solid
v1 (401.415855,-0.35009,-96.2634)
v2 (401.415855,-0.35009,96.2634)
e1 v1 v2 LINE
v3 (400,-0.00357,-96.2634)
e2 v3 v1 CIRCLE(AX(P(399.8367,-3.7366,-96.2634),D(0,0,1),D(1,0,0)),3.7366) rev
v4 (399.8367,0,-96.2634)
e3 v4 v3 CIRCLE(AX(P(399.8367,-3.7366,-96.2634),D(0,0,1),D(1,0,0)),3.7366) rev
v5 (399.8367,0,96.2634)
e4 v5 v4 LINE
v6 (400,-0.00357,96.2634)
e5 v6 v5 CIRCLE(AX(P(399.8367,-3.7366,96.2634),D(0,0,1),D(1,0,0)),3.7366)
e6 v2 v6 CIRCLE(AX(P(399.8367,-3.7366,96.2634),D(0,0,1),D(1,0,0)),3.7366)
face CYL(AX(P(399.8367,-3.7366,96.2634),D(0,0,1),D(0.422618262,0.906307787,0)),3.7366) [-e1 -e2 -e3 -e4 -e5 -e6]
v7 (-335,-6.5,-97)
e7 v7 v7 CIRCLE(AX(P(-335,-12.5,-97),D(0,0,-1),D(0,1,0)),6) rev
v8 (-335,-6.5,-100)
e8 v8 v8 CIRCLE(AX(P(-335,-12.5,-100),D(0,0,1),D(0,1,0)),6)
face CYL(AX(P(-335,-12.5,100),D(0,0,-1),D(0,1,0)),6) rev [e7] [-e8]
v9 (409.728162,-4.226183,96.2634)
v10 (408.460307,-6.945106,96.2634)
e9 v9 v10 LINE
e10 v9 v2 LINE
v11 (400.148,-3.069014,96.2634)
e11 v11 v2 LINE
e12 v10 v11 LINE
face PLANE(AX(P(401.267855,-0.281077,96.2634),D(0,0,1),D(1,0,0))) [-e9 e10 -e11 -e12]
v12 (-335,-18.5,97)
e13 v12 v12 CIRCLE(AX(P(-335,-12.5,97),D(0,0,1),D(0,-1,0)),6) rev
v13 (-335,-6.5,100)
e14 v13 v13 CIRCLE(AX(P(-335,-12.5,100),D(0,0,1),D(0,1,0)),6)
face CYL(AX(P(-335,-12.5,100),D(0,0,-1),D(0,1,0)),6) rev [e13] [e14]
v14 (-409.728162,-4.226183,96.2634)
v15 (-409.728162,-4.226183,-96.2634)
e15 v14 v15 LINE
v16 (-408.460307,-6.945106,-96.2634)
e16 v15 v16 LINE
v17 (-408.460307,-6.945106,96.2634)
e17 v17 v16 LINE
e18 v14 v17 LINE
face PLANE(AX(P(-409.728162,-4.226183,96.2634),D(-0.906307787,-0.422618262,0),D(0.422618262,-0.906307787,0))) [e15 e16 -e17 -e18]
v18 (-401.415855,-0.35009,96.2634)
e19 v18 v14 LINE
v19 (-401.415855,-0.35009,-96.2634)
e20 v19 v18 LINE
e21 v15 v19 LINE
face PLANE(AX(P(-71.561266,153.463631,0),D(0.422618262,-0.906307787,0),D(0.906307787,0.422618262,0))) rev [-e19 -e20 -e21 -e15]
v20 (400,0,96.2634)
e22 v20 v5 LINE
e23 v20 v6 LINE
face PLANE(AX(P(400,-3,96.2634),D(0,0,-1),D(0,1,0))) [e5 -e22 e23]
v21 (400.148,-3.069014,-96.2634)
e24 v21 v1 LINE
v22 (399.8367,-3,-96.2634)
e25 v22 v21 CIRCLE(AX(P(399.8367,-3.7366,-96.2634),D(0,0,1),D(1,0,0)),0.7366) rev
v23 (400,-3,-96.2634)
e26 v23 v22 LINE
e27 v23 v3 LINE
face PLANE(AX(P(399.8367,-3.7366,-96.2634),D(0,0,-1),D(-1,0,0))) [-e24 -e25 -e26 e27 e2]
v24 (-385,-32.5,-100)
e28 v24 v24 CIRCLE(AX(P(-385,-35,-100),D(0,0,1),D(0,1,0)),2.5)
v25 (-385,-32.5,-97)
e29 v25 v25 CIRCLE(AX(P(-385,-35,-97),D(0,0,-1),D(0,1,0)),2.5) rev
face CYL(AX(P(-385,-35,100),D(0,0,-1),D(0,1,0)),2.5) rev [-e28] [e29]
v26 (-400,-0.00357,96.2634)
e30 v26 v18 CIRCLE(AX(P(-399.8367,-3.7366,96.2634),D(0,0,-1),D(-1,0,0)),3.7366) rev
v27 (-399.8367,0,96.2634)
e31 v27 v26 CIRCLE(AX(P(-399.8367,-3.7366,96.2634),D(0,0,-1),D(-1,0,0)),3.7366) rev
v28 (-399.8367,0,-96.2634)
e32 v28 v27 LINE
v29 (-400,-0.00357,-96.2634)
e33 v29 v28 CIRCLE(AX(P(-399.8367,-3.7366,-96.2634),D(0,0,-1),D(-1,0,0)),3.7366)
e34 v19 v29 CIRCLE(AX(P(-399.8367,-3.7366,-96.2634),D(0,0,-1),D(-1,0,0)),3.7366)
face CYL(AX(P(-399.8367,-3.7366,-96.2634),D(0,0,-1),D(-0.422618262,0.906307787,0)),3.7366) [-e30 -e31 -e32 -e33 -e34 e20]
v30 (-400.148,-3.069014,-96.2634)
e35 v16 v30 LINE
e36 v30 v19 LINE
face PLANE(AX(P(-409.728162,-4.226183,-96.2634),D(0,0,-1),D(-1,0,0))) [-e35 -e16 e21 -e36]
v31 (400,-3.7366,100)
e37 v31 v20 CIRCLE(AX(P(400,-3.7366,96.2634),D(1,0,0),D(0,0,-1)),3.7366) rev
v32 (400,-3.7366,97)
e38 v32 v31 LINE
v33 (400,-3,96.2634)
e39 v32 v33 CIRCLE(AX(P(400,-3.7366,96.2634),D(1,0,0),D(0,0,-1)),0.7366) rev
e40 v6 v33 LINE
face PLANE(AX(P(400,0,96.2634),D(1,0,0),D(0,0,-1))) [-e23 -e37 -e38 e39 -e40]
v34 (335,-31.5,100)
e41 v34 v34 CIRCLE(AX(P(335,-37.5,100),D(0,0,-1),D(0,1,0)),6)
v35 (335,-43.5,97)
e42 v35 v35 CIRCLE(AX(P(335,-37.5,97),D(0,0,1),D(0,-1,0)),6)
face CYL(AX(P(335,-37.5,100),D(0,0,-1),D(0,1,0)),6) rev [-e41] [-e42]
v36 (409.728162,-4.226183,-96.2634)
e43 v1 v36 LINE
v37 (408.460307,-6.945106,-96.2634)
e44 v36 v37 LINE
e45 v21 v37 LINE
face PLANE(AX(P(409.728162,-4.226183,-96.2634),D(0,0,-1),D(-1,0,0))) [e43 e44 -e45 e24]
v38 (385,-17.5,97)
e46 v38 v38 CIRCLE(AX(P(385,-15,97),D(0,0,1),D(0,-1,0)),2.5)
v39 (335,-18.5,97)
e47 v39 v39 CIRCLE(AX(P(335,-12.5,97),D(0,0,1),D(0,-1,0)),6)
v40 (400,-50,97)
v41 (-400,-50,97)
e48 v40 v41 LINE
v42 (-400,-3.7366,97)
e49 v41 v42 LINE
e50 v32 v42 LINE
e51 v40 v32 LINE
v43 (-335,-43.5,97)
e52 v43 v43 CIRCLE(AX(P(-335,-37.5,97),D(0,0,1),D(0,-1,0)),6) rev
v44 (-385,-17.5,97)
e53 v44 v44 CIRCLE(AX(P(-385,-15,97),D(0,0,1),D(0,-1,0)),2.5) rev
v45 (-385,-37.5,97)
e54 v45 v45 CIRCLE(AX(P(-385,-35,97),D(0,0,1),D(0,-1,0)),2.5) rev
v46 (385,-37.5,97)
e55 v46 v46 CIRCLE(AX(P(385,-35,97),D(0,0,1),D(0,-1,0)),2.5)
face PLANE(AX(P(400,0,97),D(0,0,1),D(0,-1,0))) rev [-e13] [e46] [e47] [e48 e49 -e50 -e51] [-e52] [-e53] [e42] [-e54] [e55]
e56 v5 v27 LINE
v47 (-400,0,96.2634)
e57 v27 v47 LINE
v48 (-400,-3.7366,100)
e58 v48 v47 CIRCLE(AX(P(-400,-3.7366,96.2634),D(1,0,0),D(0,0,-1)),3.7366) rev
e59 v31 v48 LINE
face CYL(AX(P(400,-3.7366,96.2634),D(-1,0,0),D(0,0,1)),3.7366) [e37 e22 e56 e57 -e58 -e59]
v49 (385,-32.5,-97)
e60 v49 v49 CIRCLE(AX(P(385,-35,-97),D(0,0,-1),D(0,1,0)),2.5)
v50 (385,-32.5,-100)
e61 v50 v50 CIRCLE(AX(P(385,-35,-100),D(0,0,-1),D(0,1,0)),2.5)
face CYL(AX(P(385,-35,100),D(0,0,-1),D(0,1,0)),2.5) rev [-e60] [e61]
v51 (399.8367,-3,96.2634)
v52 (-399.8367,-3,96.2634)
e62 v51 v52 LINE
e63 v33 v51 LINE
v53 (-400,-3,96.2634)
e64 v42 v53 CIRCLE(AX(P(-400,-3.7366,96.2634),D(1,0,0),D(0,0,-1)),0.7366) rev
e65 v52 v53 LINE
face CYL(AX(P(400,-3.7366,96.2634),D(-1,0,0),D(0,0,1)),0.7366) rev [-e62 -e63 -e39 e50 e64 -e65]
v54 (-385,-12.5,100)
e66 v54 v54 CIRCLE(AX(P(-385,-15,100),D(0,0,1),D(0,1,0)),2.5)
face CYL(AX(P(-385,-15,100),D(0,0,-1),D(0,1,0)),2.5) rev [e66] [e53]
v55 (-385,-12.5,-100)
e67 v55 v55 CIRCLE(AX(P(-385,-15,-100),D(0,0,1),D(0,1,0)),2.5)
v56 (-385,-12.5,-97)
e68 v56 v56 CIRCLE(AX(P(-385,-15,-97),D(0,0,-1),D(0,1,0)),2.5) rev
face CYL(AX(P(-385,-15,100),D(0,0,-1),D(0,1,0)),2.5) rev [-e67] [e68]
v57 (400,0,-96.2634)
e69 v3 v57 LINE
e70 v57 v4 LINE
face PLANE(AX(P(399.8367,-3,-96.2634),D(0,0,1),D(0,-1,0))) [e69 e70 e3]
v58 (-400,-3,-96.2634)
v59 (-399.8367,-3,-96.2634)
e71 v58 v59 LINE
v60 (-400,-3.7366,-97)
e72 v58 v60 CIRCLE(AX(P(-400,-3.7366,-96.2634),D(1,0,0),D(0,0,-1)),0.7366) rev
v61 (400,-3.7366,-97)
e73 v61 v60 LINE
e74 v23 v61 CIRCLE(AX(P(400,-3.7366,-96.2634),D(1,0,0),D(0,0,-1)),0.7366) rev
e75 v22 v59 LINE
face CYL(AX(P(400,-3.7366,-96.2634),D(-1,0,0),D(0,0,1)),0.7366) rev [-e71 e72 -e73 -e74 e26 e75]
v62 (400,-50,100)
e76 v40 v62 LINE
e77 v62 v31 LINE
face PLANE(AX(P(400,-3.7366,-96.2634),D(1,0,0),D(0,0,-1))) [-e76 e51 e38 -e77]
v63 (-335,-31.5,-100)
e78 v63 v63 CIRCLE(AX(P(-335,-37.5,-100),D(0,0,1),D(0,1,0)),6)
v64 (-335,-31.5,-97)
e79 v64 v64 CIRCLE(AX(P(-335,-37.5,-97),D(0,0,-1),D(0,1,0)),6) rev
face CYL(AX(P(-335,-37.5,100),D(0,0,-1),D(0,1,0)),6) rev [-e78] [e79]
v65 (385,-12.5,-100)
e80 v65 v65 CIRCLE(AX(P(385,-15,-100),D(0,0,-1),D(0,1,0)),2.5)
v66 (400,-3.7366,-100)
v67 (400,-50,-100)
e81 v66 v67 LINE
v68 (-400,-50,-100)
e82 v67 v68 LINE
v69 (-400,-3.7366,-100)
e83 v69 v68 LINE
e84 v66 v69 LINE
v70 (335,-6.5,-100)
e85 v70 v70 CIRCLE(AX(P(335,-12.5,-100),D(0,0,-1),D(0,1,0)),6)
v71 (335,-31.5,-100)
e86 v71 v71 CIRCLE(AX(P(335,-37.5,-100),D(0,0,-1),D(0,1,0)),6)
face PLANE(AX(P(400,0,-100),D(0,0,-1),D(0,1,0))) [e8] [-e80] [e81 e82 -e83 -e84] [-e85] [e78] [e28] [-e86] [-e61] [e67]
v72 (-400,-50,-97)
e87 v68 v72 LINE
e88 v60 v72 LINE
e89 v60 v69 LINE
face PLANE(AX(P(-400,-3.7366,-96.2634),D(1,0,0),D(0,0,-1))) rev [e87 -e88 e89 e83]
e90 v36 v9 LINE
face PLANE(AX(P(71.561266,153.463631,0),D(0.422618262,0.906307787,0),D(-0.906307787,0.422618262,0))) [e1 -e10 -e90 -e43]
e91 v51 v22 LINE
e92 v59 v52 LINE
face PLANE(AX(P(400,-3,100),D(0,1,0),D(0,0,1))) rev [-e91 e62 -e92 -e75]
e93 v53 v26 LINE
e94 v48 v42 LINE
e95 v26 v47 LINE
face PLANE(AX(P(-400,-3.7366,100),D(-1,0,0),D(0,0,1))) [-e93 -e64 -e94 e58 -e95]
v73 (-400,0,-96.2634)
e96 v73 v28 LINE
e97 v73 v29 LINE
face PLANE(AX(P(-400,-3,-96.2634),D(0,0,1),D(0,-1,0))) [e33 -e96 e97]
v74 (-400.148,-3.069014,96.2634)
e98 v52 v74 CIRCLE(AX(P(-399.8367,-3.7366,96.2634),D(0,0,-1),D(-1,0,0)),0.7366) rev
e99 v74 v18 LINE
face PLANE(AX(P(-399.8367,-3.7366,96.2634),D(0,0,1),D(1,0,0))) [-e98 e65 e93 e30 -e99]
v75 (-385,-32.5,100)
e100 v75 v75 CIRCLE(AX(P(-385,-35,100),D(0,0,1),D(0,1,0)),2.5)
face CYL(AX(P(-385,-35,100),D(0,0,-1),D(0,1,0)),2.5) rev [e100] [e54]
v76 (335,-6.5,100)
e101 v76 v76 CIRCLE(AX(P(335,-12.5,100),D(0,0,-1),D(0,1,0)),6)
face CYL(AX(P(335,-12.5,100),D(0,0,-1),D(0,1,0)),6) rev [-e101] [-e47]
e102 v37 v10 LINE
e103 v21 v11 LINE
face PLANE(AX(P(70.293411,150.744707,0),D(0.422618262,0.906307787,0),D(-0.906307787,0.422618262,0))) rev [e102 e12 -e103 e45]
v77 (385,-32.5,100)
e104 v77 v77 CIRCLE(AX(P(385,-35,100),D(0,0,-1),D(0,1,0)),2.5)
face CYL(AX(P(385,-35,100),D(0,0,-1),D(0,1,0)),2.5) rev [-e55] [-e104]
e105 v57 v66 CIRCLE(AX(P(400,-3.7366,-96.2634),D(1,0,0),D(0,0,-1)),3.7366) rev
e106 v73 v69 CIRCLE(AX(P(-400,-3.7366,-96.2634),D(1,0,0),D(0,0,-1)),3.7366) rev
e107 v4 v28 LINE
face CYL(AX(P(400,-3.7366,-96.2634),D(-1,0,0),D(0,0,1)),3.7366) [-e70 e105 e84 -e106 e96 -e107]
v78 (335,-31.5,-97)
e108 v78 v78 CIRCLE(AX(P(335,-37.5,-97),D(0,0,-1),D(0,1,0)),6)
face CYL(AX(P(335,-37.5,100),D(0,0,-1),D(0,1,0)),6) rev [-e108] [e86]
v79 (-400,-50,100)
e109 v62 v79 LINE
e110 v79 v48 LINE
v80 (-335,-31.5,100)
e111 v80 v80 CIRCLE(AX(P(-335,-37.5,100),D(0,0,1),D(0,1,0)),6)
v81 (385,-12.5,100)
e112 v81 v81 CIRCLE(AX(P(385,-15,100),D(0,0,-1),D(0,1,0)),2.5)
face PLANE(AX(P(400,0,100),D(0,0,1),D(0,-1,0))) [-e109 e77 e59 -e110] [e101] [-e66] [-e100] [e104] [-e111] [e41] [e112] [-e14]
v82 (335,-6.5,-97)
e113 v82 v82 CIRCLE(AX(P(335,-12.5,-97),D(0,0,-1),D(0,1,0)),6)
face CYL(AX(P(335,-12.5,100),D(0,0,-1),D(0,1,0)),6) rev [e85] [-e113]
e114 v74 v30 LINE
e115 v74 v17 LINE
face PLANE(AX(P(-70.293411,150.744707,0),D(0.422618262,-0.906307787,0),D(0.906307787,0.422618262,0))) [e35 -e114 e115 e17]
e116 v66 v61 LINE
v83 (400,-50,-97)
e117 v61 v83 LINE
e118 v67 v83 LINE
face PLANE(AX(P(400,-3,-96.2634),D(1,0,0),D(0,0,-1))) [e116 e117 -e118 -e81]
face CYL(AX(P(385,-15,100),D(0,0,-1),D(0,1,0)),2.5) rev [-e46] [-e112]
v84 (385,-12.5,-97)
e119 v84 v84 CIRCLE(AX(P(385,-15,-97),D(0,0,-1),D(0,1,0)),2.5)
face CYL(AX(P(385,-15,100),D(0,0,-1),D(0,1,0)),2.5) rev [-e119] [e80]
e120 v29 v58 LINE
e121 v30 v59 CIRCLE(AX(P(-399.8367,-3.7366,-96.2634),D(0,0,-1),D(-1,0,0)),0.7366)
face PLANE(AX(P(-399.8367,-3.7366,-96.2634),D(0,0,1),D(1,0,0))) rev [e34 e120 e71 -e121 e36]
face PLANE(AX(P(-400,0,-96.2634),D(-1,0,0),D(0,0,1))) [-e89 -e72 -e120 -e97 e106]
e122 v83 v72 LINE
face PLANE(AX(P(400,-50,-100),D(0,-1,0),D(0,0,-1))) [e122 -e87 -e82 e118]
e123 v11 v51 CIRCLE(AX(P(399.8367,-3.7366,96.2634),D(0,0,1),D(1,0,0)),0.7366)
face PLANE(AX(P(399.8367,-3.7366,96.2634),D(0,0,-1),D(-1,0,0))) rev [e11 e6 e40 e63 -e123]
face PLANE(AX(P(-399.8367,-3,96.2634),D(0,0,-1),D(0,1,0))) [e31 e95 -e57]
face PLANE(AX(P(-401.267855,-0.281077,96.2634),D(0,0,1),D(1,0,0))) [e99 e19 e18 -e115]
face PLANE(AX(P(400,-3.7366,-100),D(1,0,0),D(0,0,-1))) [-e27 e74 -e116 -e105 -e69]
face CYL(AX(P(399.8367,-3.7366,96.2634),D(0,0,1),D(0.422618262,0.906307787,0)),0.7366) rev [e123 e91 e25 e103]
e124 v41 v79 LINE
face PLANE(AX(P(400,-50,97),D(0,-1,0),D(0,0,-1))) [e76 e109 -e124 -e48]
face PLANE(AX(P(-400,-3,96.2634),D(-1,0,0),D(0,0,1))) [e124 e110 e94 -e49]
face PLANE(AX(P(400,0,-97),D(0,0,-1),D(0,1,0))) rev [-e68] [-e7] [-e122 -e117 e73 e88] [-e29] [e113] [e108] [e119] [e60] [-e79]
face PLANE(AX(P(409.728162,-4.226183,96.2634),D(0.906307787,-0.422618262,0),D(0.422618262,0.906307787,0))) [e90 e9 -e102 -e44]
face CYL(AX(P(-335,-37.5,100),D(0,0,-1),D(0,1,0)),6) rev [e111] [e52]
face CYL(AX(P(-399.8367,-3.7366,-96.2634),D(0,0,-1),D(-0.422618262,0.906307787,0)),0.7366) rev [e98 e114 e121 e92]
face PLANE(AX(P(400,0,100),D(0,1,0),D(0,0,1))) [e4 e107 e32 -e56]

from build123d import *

# Parameters (mm, degrees)
BASE_FLANGE1_DEPTH             = 400
SKETCH6_R                      = 2.5
CUT_EXTRUDE2_DEPTH             = 451
SKETCH10_R                     = 6
CUT_EXTRUDE1_DEPTH             = 451
KENAR_FLAN_1_STRIP_CUT_DEPTH   = 192.5268
KENAR_FLAN_1_STRIP_CUT_2_DEPTH = 192.5268
KENAR_FLAN_1_DEPTH             = 192.5268
KENAR_FLAN_1_BEND_DEPTH        = 192.5268


# Sheet-metal steps are written as plain solids
with BuildPart() as part:
    # Sketch1 → Base-Flange1 (new, symmetric)
    with BuildSketch(Plane(origin=(0, 0, 0), x_dir=(0, 0, -1), z_dir=(1, 0, 0))):
        with BuildLine():
            Line((-100, -50), (-100, -3.7366))
            ThreePointArc((-100, -3.7366), (-98.905575199, -1.094424801), (-96.2634, 0))
            Line((-96.2634, 0), (96.2634, 0))
            ThreePointArc((96.2634, 0), (98.905575199, -1.094424801), (100, -3.7366))
            Line((100, -3.7366), (100, -50))
            Line((100, -50), (97, -50))
            Line((97, -50), (97, -3.7366))
            ThreePointArc((97, -3.7366), (96.784254855, -3.215745145), (96.2634, -3))
            Line((96.2634, -3), (-96.2634, -3))
            ThreePointArc((-96.2634, -3), (-96.784254855, -3.215745145), (-97, -3.7366))
            Line((-97, -3.7366), (-97, -50))
            Line((-97, -50), (-100, -50))
        make_face()
    extrude(amount=BASE_FLANGE1_DEPTH, both=True)

    # Sketch6 → Cut-Extrude2 (cut, through all)
    with BuildSketch(Plane(origin=(0, 0, -100), x_dir=(-1, 0, 0), z_dir=(0, 0, -1))):
        with Locations(Location((-385, -15, 0), (0, 0, 90))):
            Circle(SKETCH6_R)
        with Locations(Location((-385, -35, 0), (0, 0, 90))):
            Circle(SKETCH6_R)
    cut_extrude2 = extrude(amount=-CUT_EXTRUDE2_DEPTH, mode=Mode.SUBTRACT)

    # Sketch10 → Cut-Extrude1 (cut, through all)
    with BuildSketch(Plane(origin=(0, 0, -100), x_dir=(-1, 0, 0), z_dir=(0, 0, -1))):
        with Locations(Location((-335, -12.5, 0), (0, 0, 90))):
            Circle(SKETCH10_R)
        with Locations(Location((-335, -37.5, 0), (0, 0, 90))):
            Circle(SKETCH10_R)
    cut_extrude1 = extrude(amount=-CUT_EXTRUDE1_DEPTH, mode=Mode.SUBTRACT)

    # Kenar-Flanş1 strip (across the edge) → Kenar-Flanş1 strip cut (cut)
    with BuildSketch(Plane(origin=(400, -3, -96.2634), x_dir=(-0.42261826174069383, -0.9063077870366526, 0), z_dir=(0, 0, 1))):
        Polygon((-8.343930041, 10.795010968), (-2.649909677, -1.415855108), (0.069013684, -0.148000323), (-5.62500668, 12.062865753), align=None)
    extrude(amount=KENAR_FLAN_1_STRIP_CUT_DEPTH, mode=Mode.SUBTRACT)

    # Kenar-Flanş1 strip 2 (across the edge) → Kenar-Flanş1 strip cut 2 (cut)
    with BuildSketch(Plane(origin=(-400, -3, 96.2634), x_dir=(0.42261826174069383, -0.9063077870366526, 0), z_dir=(0, 0, -1))):
        Polygon((-8.343930041, 10.795010968), (-2.649909677, -1.415855108), (0.069013684, -0.148000323), (-5.62500668, 12.062865753), align=None)
    extrude(amount=KENAR_FLAN_1_STRIP_CUT_2_DEPTH, mode=Mode.SUBTRACT)

    # Kenar-Flanş1 section (across the edge) → Kenar-Flanş1 (add)
    with BuildSketch(Plane(origin=(400, -3, -96.2634), x_dir=(-0.42261826174069383, -0.9063077870366526, 0), z_dir=(0, 0, 1))):
        with BuildLine():
            Line((-3, 0.163300289), (-3, 9.334916012))
            Line((-3, 9.334916012), (0, 9.334916012))
            Line((0, 9.334916012), (0, 0.163300289))
            ThreePointArc((0, 0.163300289), (0.017460361, 0.003870869), (0.069013684, -0.148000323))
            Line((0.069013684, -0.148000323), (-2.649909677, -1.415855108))
            ThreePointArc((-2.649909677, -1.415855108), (-2.91142766, -0.645447973), (-3, 0.163300289))
        make_face()
    extrude(amount=KENAR_FLAN_1_DEPTH)

    # Kenar-Flanş1 section 2 (across the edge) → Kenar-Flanş1 bend (add)
    with BuildSketch(Plane(origin=(-400, -3, 96.2634), x_dir=(0.42261826174069383, -0.9063077870366526, 0), z_dir=(0, 0, -1))):
        with BuildLine():
            Line((-3, 0.163300289), (-3, 9.334916012))
            Line((-3, 9.334916012), (0, 9.334916012))
            Line((0, 9.334916012), (0, 0.163300289))
            ThreePointArc((0, 0.163300289), (0.017460361, 0.003870869), (0.069013684, -0.148000323))
            Line((0.069013684, -0.148000323), (-2.649909677, -1.415855108))
            ThreePointArc((-2.649909677, -1.415855108), (-2.91142766, -0.645447973), (-3, 0.163300289))
        make_face()
    extrude(amount=KENAR_FLAN_1_BEND_DEPTH)

    # Mirror1: Cut-Extrude2, Cut-Extrude1 across plane
    add(cut_extrude2.mirror(Plane(origin=(0, 0, 0), x_dir=(0, 0, 1), z_dir=(1, 0, 0))), mode=Mode.SUBTRACT)
    add(cut_extrude1.mirror(Plane(origin=(0, 0, 0), x_dir=(0, 0, 1), z_dir=(1, 0, 0))), mode=Mode.SUBTRACT)


solid = part.part
